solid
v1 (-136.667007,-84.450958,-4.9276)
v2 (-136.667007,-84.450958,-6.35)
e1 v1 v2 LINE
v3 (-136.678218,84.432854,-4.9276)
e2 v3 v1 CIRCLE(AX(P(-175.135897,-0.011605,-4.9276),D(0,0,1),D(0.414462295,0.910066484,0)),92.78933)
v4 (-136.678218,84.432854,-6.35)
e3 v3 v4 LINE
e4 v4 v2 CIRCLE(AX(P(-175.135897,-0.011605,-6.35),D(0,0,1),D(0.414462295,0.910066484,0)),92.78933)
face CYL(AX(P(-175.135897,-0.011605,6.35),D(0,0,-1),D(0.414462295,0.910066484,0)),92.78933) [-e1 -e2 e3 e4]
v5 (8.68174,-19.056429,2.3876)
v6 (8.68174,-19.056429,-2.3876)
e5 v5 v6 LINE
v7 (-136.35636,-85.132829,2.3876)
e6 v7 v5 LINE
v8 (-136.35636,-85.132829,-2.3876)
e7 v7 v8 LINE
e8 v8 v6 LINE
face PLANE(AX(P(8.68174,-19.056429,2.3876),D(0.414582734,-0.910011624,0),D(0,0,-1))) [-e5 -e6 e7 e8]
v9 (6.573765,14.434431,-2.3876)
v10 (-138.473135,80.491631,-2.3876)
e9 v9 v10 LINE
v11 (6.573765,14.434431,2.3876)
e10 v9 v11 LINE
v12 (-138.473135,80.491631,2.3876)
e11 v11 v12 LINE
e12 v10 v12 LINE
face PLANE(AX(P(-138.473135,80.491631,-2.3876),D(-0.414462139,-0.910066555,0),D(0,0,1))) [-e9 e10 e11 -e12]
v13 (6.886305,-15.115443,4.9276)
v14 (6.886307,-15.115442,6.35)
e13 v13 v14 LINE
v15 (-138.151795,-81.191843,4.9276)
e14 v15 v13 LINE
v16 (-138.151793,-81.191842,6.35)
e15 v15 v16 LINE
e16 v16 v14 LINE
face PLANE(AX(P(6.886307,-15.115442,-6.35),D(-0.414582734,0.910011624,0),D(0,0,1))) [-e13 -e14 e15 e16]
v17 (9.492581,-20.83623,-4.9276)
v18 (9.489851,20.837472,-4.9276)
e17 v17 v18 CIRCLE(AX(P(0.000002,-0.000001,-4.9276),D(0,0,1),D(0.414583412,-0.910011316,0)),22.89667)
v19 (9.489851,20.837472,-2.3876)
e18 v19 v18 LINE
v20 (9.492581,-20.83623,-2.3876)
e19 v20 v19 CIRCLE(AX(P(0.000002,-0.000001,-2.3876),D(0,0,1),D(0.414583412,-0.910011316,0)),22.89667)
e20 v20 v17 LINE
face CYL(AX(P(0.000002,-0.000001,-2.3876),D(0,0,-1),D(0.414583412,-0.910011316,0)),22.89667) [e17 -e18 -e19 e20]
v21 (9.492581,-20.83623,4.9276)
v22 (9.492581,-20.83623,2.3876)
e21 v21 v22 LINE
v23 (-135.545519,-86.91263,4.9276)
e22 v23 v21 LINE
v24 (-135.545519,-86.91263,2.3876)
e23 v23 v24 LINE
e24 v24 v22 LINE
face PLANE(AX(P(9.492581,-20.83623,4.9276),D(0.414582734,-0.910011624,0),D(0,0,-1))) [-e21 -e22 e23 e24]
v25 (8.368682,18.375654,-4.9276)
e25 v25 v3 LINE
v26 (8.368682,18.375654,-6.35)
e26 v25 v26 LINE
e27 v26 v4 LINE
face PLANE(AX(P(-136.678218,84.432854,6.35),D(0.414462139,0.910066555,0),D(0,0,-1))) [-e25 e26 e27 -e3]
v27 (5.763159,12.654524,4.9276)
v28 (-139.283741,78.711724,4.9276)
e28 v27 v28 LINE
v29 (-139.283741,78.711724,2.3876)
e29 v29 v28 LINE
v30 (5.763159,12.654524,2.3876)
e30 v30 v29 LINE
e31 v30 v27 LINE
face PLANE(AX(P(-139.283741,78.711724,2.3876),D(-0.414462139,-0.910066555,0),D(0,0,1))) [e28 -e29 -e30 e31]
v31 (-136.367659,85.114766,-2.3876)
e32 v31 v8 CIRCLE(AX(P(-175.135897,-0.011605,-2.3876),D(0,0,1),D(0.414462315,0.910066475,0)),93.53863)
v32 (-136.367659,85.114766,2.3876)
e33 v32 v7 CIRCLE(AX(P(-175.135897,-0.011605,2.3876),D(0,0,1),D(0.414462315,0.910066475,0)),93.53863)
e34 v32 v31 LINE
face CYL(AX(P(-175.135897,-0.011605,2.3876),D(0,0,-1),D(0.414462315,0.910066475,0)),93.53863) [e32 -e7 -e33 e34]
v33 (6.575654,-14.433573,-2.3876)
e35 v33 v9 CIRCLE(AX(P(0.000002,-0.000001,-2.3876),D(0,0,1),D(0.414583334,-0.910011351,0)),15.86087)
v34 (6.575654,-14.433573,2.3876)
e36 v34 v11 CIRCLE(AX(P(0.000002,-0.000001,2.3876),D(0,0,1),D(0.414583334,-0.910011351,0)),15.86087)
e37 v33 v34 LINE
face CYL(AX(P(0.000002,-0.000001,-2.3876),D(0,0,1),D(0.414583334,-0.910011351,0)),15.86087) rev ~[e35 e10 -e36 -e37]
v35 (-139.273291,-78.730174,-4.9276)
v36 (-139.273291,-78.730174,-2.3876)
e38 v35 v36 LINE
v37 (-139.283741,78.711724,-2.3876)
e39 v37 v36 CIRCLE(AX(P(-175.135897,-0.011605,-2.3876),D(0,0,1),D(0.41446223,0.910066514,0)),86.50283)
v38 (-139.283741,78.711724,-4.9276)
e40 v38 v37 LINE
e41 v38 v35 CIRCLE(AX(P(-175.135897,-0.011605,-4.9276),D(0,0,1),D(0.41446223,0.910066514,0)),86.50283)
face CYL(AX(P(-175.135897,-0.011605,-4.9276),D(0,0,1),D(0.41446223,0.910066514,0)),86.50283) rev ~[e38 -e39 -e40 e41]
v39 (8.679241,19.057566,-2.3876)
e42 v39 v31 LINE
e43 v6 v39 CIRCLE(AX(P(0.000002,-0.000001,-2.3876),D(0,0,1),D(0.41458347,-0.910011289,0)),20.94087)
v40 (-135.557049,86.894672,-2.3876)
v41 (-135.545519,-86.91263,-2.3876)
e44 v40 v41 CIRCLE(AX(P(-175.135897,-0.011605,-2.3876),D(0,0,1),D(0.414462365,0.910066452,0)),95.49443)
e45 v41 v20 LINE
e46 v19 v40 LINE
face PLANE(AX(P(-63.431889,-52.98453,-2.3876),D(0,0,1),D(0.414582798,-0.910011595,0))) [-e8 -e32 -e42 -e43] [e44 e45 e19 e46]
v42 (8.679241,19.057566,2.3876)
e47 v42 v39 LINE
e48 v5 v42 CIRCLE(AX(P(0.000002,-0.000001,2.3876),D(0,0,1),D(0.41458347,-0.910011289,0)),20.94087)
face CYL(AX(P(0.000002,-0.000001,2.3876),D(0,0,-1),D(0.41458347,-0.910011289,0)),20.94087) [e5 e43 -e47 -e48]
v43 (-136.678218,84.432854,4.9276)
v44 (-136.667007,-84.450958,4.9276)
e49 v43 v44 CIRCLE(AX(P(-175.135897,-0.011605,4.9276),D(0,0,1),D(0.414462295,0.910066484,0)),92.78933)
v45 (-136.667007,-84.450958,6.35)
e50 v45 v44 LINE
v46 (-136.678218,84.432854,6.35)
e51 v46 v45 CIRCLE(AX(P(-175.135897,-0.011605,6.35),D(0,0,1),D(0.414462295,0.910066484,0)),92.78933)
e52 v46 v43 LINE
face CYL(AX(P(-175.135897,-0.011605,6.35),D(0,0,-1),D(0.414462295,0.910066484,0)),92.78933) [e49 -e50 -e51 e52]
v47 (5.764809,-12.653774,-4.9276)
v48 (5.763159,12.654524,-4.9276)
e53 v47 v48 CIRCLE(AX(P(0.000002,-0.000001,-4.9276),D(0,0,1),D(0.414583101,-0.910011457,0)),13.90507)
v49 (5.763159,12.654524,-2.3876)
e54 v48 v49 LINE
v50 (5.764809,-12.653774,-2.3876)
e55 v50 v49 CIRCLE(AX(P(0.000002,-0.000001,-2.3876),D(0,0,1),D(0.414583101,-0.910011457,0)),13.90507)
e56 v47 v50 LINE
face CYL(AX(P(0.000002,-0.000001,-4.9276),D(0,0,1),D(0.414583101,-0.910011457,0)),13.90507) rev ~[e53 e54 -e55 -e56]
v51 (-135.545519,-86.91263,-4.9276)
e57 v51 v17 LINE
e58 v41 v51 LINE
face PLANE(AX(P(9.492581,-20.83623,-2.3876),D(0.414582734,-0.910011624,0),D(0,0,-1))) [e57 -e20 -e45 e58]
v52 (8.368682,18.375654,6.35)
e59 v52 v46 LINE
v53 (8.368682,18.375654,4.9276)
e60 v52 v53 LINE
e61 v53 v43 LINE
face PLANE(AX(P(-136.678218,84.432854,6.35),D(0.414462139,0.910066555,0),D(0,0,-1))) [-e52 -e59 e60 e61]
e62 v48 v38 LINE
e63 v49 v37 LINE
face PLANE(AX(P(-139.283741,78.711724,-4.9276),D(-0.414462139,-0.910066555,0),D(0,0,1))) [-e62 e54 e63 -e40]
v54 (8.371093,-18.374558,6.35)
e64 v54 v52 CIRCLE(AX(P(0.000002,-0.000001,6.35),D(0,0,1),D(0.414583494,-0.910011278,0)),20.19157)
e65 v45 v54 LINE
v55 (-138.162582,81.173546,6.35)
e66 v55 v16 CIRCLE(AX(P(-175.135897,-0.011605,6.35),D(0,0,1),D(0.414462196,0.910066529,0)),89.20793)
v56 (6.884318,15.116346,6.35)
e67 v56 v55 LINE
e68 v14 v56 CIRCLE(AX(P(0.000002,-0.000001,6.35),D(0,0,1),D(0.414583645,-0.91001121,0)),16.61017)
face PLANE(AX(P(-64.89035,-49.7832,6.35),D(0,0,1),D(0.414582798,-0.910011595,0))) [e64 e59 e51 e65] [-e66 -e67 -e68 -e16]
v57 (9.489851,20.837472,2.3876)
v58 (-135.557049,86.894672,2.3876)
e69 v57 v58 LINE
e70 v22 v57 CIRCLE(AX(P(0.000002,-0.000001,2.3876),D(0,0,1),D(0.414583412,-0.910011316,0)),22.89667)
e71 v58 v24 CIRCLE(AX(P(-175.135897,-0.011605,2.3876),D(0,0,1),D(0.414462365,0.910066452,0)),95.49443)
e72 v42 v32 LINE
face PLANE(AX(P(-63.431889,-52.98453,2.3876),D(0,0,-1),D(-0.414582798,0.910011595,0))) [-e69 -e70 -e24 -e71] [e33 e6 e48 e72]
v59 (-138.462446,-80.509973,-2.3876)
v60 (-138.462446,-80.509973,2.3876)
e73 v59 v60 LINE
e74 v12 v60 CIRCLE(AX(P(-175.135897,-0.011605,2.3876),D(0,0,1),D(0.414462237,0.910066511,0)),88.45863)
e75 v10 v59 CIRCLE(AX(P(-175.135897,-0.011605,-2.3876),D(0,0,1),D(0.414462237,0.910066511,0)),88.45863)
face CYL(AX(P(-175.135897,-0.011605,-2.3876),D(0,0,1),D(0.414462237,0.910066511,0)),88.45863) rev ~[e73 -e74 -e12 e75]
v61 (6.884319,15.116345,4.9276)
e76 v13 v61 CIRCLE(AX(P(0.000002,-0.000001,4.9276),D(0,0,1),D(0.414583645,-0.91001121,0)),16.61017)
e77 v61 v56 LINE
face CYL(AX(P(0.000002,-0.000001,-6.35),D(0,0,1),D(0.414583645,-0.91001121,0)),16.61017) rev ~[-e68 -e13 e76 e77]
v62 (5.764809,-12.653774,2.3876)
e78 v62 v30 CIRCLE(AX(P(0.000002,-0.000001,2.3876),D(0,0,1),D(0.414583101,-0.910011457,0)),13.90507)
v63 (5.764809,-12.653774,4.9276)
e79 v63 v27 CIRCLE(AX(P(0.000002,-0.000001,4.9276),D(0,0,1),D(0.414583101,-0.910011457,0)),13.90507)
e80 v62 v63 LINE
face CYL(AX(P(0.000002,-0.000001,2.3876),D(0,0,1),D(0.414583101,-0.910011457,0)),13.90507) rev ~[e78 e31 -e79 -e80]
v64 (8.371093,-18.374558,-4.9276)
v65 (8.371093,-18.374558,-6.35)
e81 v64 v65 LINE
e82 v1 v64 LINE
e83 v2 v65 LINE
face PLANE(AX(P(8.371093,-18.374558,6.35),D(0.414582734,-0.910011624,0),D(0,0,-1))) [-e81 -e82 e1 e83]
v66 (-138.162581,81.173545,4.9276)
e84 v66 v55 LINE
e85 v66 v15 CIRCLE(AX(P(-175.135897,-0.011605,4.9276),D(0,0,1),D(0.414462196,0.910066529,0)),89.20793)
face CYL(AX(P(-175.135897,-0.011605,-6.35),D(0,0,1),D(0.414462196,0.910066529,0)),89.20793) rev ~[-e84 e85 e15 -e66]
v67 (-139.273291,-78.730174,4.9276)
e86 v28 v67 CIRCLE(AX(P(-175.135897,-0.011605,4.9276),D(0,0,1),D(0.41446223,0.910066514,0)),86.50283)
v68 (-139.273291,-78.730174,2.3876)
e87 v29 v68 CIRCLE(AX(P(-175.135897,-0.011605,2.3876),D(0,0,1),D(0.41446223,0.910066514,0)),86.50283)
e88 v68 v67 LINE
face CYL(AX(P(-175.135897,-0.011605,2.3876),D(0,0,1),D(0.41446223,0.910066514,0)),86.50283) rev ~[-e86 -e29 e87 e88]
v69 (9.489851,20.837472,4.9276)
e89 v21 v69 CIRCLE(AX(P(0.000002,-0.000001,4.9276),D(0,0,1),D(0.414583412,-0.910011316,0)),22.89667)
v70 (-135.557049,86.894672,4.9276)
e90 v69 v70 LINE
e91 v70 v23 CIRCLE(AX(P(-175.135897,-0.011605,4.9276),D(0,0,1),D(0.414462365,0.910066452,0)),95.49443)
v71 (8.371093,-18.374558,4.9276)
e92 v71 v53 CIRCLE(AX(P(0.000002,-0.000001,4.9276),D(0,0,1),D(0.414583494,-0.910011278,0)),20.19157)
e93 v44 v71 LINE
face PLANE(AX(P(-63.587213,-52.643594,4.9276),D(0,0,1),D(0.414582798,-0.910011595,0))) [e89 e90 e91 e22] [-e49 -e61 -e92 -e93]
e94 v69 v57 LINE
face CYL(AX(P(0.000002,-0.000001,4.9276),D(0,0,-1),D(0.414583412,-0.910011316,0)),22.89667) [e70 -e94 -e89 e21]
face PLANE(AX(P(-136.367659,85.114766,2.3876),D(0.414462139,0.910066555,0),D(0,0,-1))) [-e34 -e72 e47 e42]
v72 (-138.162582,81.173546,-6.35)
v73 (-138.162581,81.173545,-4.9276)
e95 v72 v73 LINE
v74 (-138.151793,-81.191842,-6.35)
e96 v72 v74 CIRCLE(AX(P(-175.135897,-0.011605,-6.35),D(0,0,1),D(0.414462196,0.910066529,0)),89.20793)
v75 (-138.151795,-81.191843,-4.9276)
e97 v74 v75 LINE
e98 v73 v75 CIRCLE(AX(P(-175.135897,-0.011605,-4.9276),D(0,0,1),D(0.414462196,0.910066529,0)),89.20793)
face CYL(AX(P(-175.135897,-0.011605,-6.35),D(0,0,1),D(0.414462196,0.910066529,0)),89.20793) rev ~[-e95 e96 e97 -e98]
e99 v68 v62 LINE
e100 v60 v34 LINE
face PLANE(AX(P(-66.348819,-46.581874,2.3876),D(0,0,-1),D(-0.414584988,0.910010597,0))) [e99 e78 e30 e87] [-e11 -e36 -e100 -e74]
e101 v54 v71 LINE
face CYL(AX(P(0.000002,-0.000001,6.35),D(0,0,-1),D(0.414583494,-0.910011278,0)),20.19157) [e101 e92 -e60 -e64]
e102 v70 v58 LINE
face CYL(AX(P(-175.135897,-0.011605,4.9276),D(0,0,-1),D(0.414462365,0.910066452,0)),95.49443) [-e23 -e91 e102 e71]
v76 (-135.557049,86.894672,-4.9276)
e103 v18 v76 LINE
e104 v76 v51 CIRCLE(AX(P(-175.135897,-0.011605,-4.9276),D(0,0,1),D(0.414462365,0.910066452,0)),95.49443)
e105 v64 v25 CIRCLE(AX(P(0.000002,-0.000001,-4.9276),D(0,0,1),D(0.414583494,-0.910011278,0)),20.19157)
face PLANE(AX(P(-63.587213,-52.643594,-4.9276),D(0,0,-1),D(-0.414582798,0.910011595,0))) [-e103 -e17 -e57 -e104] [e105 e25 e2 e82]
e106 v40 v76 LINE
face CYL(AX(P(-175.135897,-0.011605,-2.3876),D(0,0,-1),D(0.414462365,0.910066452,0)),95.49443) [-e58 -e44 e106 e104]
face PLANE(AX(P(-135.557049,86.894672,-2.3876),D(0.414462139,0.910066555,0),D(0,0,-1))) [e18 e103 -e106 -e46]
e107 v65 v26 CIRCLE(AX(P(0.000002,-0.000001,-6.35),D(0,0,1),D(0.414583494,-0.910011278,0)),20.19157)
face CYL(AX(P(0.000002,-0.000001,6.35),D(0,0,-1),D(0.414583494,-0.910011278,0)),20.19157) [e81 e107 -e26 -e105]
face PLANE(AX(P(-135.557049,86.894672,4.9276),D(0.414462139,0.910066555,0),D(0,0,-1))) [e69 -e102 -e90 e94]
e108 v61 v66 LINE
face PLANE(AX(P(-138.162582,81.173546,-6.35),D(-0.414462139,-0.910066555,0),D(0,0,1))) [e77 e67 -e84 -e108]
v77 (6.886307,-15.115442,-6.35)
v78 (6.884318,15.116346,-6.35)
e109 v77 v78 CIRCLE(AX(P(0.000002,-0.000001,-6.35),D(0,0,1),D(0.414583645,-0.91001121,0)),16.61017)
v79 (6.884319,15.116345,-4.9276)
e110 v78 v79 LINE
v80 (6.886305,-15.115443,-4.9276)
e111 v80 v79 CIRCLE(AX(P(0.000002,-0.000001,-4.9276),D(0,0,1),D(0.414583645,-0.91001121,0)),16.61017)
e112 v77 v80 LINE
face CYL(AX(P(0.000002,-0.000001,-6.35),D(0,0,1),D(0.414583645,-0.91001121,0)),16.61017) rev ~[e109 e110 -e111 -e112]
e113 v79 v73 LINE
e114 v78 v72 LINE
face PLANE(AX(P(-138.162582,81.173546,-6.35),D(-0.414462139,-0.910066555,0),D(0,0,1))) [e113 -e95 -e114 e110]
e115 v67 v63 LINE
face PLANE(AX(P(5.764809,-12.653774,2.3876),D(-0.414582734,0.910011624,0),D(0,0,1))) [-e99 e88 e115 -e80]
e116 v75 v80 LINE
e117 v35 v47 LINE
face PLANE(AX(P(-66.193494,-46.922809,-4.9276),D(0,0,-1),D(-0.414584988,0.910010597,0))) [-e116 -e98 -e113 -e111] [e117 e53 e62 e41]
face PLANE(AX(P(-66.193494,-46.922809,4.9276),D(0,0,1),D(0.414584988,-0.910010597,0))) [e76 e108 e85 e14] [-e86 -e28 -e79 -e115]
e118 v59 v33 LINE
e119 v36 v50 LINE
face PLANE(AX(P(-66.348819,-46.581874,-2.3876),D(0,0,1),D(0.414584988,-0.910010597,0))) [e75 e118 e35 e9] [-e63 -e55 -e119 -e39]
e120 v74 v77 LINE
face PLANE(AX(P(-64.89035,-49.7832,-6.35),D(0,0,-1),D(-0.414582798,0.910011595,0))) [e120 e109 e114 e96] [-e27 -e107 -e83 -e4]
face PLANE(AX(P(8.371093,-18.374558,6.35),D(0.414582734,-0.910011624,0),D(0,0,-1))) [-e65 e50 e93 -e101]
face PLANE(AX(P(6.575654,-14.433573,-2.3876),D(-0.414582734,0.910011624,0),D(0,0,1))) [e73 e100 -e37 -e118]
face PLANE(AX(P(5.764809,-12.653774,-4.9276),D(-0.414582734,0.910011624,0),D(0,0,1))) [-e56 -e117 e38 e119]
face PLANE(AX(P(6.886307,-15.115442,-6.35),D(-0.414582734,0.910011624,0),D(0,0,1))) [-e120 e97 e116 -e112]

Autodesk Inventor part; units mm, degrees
ref_plane "Work Plane2" through (-175.1359, -0.0116, 0) normal (-1, 0, 0) x (0, 0, 1)
ref_plane "Work Plane3" through (0, 0, 0) normal (-0.8658937, 0.500228, 0) x (0, 0, 1)
sketch "Path" plane through (0, 0, 0) normal (0, 0, 1) x (1, 0, 0)
  arc A0 (-137.4204, 82.8032) -> (-137.4094, -82.8214) centre (-175.1359, -0.0116) ccw
  arc A1 (7.6287, -16.745) -> (7.6265, 16.746) centre (0, 0) ccw
  line L0 (7.6287, -16.745) -> (-137.4094, -82.8214)
  line L1 (-137.4204, 82.8032) -> (7.6265, 16.746)
  dimension "d31" = 8.9916
ref_plane "Section Plane" through (-137.4094, -82.8214, 0) normal (0.9100116, 0.4145828, 0) x (0, 0, 1)
sketch "Section Sketch" plane through (-137.4094, -82.8214, 0) normal (0.9100116, 0.4145828, 0) x (0, 0, 1)
  line L0 (-6.35, -1.7907) -> (6.35, -1.7907)
  line L1 (6.35, -1.7907) -> (6.35, 1.7907)
  line L2 (6.35, 1.7907) -> (-6.35, 1.7907)
  line L3 (-6.35, 1.7907) -> (-6.35, -1.7907)
  line L4 (-2.3876, -2.54) -> (2.3876, -2.54)
  line L5 (2.3876, -2.54) -> (2.3876, 2.54)
  line L6 (2.3876, 2.54) -> (-2.3876, 2.54)
  line L7 (-2.3876, 2.54) -> (-2.3876, -2.54)
  line L8 (-2.3876, 0) -> (2.3876, 0) construction
  line L9 (-4.9276, -4.4958) -> (-2.3876, -4.4958)
  line L10 (-2.3876, -4.4958) -> (-2.3876, 4.4958)
  line L11 (-2.3876, 4.4958) -> (-4.9276, 4.4958)
  line L12 (-4.9276, 4.4958) -> (-4.9276, -4.4958)
  line L13 (2.3876, -4.4958) -> (4.9276, -4.4958)
  line L14 (4.9276, -4.4958) -> (4.9276, 4.4958)
  line L15 (4.9276, 4.4958) -> (2.3876, 4.4958)
  line L16 (2.3876, 4.4958) -> (2.3876, -4.4958)
  line L17 (-6.35, 0) -> (6.35, 0) construction
  point P0 (0, 0)
  point P1 (0, 0)
  dimension "d21" = 3.5814
  dimension "d22" = 5.08
  dimension "d23" = 4.7752
  dimension "d24" = 2.54
  dimension "d31" = 8.9916
  dimension "d32" = 12.7
sweep "Solid" add profiles "Section Sketch" path "Path"
pattern_of_one "Strand Pattern"
equation "\"d21\" = da_d2"
equation "\"d22\" = da_d1"
equation "\"d23\" = da_b1"
equation "\"d24\" = da_t1 + da_t2"
equation "\"d30\" = da_pt"
equation "\"da_p\" = 9.525"
equation "\"da_b1\" = 4.7752"
equation "\"da_h2\" = 8.9916"
equation "\"da_h3\" = 7.7978"
equation "\"da_d1\" = 5.08"
equation "\"da_d2\" = 3.5814"
equation "\"da_pt\" = 10.1346"
equation "\"da_b\" = 12.7"
equation "\"da_t1\" = 1.27"
equation "\"da_t2\" = 1.27"
properties part number "Roller Chain"
